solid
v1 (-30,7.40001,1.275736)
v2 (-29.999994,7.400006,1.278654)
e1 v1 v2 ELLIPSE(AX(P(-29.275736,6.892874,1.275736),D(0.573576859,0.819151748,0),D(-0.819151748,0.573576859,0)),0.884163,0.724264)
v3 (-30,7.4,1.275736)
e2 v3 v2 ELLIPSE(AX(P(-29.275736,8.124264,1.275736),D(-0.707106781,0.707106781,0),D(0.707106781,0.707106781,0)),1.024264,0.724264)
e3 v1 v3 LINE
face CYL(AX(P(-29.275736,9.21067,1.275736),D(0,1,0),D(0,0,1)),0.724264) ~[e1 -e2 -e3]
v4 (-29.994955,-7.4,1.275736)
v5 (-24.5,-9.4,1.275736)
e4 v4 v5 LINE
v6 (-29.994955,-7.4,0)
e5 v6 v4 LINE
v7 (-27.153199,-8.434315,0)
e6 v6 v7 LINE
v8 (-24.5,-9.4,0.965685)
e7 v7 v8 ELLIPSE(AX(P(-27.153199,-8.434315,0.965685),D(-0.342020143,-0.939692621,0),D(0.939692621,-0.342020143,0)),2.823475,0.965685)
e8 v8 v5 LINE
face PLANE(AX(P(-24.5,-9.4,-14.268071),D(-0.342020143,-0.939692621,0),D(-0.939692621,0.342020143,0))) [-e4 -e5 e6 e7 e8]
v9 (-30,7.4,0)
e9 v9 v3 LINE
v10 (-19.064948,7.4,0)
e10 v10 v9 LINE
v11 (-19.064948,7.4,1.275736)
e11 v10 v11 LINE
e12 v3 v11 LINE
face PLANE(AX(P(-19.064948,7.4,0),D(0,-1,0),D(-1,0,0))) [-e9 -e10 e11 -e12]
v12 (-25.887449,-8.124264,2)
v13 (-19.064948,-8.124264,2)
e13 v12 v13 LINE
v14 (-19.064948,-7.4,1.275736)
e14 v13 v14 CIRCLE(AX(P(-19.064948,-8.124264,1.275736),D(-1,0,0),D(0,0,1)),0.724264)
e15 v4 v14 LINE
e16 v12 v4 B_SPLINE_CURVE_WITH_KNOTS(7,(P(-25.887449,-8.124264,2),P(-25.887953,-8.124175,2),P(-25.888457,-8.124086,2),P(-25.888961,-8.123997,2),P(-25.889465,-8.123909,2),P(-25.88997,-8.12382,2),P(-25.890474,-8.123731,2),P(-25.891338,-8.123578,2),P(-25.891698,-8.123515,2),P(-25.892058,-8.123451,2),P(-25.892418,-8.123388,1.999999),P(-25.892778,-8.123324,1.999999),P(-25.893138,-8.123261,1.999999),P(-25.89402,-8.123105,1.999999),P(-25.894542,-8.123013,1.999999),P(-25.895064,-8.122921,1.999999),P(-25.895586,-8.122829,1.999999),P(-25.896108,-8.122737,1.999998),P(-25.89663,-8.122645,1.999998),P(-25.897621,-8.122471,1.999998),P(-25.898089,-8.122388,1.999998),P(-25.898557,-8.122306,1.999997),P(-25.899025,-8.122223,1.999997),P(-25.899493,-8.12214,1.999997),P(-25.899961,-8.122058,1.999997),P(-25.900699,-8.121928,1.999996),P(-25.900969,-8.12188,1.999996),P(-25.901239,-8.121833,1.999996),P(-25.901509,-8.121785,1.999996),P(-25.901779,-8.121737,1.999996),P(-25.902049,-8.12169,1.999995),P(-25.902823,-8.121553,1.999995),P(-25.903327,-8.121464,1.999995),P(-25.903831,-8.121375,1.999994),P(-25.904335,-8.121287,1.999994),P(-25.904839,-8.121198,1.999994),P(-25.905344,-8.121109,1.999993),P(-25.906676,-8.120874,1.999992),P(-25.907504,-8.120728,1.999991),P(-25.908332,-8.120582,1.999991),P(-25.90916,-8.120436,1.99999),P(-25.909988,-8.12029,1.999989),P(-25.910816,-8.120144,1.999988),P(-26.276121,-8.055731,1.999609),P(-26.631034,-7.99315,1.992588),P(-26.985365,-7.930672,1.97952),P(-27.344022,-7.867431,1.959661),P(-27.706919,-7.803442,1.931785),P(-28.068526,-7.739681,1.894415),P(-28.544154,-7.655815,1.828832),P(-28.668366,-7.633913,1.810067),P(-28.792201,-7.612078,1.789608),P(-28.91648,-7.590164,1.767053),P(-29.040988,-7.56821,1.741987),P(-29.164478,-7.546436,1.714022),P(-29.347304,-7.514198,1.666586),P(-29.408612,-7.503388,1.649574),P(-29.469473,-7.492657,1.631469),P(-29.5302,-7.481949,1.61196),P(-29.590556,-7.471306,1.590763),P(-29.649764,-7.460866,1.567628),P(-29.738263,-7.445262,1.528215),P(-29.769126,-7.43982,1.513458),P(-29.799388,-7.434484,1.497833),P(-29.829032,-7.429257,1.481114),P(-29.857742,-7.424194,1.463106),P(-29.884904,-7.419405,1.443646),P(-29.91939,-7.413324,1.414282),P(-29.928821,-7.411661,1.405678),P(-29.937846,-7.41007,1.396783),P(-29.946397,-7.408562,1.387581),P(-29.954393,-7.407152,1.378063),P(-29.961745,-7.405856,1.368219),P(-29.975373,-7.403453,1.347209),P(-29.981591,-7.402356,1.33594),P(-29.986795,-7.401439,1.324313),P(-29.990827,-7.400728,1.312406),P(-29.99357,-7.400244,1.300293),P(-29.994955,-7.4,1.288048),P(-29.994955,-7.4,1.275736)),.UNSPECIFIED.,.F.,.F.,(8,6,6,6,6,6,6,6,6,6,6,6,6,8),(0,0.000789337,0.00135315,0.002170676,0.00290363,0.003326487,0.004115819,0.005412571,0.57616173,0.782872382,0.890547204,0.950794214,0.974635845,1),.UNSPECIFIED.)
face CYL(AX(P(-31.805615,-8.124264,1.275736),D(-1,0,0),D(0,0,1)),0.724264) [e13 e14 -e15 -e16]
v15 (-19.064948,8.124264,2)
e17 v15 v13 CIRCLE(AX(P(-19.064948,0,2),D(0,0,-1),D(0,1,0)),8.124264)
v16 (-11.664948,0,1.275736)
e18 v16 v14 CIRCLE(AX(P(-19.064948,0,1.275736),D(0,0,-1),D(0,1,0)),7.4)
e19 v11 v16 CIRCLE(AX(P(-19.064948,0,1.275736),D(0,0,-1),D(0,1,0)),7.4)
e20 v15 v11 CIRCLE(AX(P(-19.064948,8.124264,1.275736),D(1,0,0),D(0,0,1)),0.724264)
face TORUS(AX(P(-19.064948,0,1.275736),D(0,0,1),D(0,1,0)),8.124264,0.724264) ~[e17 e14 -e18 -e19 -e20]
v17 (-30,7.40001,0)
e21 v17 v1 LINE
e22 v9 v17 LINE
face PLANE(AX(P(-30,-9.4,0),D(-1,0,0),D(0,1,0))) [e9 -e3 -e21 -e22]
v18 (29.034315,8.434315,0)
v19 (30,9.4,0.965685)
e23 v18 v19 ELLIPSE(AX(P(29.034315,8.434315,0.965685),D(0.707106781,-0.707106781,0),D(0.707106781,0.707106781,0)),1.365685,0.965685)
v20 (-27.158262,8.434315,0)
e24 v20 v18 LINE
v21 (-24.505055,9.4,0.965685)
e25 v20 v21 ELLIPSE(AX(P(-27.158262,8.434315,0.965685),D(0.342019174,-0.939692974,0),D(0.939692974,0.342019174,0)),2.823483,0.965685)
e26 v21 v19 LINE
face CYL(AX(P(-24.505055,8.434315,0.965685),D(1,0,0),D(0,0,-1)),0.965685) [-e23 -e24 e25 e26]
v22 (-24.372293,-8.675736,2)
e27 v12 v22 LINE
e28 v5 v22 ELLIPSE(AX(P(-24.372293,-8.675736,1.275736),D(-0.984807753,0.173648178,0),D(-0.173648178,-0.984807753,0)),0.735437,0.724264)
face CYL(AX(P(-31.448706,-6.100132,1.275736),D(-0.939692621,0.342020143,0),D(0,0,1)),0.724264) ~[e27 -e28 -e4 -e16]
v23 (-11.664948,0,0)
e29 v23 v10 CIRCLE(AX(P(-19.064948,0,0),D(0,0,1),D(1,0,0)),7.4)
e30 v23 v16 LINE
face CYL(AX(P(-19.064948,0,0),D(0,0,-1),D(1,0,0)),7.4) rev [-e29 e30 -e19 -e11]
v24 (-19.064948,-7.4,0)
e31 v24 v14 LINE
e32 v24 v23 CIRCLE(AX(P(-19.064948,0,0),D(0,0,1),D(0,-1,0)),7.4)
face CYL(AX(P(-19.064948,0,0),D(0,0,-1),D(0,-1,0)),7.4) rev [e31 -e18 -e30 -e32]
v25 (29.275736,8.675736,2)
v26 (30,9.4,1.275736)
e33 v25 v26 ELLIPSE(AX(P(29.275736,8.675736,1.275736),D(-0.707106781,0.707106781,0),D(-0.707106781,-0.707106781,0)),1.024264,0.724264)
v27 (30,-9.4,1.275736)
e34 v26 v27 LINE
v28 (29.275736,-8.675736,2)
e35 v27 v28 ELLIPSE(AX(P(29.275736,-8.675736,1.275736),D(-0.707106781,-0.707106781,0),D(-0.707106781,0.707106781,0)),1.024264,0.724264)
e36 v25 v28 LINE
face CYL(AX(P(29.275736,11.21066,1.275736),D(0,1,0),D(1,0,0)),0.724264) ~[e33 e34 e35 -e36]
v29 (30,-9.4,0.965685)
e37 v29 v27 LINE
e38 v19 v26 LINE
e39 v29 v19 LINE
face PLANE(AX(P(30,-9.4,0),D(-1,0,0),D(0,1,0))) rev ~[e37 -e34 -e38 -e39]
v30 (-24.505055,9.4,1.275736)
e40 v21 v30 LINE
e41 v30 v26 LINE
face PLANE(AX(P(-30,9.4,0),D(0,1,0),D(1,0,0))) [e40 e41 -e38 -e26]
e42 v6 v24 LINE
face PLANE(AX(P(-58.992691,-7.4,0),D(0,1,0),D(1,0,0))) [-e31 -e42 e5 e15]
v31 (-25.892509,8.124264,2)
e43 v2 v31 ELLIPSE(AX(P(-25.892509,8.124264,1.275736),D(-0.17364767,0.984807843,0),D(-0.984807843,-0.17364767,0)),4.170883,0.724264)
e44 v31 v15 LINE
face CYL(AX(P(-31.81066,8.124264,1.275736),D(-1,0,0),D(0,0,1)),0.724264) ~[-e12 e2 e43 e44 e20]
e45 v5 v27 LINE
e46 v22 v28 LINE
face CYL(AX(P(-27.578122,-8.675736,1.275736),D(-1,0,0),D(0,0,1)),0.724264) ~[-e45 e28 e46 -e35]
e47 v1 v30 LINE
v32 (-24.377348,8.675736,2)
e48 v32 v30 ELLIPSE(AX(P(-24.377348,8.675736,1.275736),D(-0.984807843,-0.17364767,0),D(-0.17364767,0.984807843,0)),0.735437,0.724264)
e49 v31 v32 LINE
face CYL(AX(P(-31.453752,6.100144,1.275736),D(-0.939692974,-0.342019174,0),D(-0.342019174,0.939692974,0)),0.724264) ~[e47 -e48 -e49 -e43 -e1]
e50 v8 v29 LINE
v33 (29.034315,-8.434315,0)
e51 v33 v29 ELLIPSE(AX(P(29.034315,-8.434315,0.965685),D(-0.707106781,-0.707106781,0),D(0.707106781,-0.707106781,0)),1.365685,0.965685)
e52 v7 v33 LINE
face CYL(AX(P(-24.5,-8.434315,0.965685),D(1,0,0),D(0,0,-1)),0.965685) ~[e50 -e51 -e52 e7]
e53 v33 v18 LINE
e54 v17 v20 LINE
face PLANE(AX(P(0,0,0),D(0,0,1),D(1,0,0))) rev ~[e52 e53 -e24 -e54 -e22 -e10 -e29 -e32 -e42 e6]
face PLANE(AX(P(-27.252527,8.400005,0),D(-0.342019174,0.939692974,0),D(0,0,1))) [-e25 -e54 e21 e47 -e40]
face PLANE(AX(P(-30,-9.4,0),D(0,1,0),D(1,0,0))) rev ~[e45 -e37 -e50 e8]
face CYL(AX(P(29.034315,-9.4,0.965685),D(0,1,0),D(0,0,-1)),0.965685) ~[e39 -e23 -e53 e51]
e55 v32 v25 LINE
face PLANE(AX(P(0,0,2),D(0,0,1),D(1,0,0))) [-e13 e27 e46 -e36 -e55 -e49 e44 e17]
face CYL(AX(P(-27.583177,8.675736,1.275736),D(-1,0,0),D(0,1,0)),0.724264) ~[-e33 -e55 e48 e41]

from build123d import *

# Parameters (mm, degrees)
F0_W         = 60
F0_H         = 18.8
F2_DEPTH     = 2
F3_DEPTH     = 3
F5_T1_DEPTH  = 30.5361420581
F6_SIZE2     = 5.494945
F6_SIZE      = 1.99999
F7_T1_DEPTH  = 59.3887824638
F7_T3_DEPTH  = 59.3938374638
F7_T5_DEPTH  = 22.4213203436
F7_T7_DEPTH  = 10.7363912706
F7_T9_DEPTH  = 3.6213303413
F7_T11_DEPTH = 12.745712209
F7_T13_DEPTH = 10.7363785984
F7_T15_DEPTH = 12.740667054
F7_T18_ANGLE = 180
F8_R         = 0.9656854249


# Not quite as in the source:
# - a fillet or chamfer that OpenCascade refuses, or shapes differently, is made with other operations: its cross-section is extruded or revolved along the edge and cut away or added
# - a fillet or chamfer is up to 0.001 mm smaller than in the source, because OpenCascade refuses the exact size


with BuildPart() as f2:
    # F0 (on Top) → F2 (new body)
    with BuildSketch(Plane.XY):
        Rectangle(F0_W, F0_H)
    extrude(amount=F2_DEPTH)


with BuildPart() as f3:
    # F1 (on Top) → F3 (new body)
    with BuildSketch(Plane.XY):
        with BuildLine():
            ThreePointArc((-19.0649479628, -7.3999999978), (-13.832357782, -5.2325901785), (-11.6649479628, 2.2e-09))
            ThreePointArc((-11.6649479628, 2.2e-09), (-13.832357782, 5.232590183), (-19.0649479628, 7.4000000022))
            Line((-19.0649479628, 7.4000000022), (-19.0649479628, -7.3999999978))
        make_face()
        with BuildLine():
            Line((-19.0649479628, -7.3999999978), (-19.0649479628, 7.4000000022))
            ThreePointArc((-19.0649479628, 7.4000000022), (-26.4649479628, 2.2e-09), (-19.0649479628, -7.3999999978))
        make_face()
        with BuildLine():
            ThreePointArc((-19.0649479628, -7.3999999978), (-26.4649479628, 2.2e-09), (-19.0649479628, 7.4000000022))
            Line((-19.0649479628, 7.4000000022), (-58.9926913381, 7.4000000022))
            Line((-58.9926913381, 7.4000000022), (-58.9926913381, -7.3999999978))
            Line((-58.9926913381, -7.3999999978), (-19.0649479628, -7.3999999978))
        make_face()
    extrude(amount=F3_DEPTH)


with BuildPart() as f2_1:
    add(f2.part)

    # F4: cut F3
    add(f3.part, mode=Mode.SUBTRACT)

    # F5: chamfer of 5.5 x 2.0018362885 on 1 edges, made by hand

    # F5_s2 → F5_t1 (cut)
    with BuildSketch(Plane.XY.offset(-14.268071029)):
        Polygon((-24.5, -9.4), (-30, -7.3981637115), (-30, -9.4), align=None)
    extrude(amount=F5_T1_DEPTH, mode=Mode.SUBTRACT)

    # F6 (size 2 and 5.4949548389 in the source; OpenCascade refuses exactly that, so slightly less here)
    f6_edges = [f2_1.edges().sort_by_distance(p)[0] for p in [
        (-30, 9.4, 1),
    ]]
    f6_side = f2_1.faces().sort_by_distance((-30, 8.4, 1))[0]
    chamfer(f6_edges, length=F6_SIZE, length2=F6_SIZE2, reference=f6_side)

    # F7: fillet of radius 0.7242640687 on 9 edges, made by hand

    # F7_s2 → F7_t1 (cut)
    with BuildSketch(Plane.YZ.offset(-27.578122292)):
        with BuildLine():
            ThreePointArc((-8.6757359313, 2), (-9.1878679656, 1.7878679656), (-9.4, 1.2757359313))
            Line((-9.4, 1.2757359313), (-9.4, 2))
            Line((-9.4, 2), (-8.6757359313, 2))
        make_face()
    extrude(amount=F7_T1_DEPTH, mode=Mode.SUBTRACT)

    # F7_s4 → F7_t3 (cut)
    with BuildSketch(Plane.YZ.offset(-27.583177292)):
        with BuildLine():
            ThreePointArc((9.4, 1.2757359313), (9.1878679656, 1.7878679656), (8.6757359313, 2))
            Line((8.6757359313, 2), (9.4, 2))
            Line((9.4, 2), (9.4, 1.2757359313))
        make_face()
    extrude(amount=F7_T3_DEPTH, mode=Mode.SUBTRACT)

    # F7_s6 → F7_t5 (cut)
    with BuildSketch(Plane.XZ.offset(-11.2106601718)):
        with BuildLine():
            ThreePointArc((30, 1.2757359313), (29.7878679656, 1.7878679656), (29.2757359313, 2))
            Line((29.2757359313, 2), (30, 2))
            Line((30, 2), (30, 1.2757359313))
        make_face()
    extrude(amount=F7_T5_DEPTH, mode=Mode.SUBTRACT)

    # F7_s8 → F7_t7 (cut)
    with BuildSketch(Plane(origin=(-25.8093615097, 9.3938393551, 0), x_dir=(0, 0, 1), z_dir=(0.9396926208, -0.3420201433, 0))):
        with BuildLine():
            ThreePointArc((2, 16.4883400783), (1.7878679656, 17.0004721126), (1.2757359313, 17.212604147))
            Line((1.2757359313, 17.212604147), (2, 17.212604147))
            Line((2, 17.212604147), (2, 16.4883400783))
        make_face()
    extrude(amount=F7_T7_DEPTH, mode=Mode.SUBTRACT)

    # F7_s10 → F7_t9 (cut)
    with BuildSketch(Plane.XZ.offset(-9.2106701718)):
        with BuildLine():
            ThreePointArc((-29.2757359313, 2), (-29.7878679656, 1.7878679656), (-30, 1.2757359313))
            Line((-30, 1.2757359313), (-30, 2))
            Line((-30, 2), (-29.2757359313, 2))
        make_face()
    extrude(amount=F7_T9_DEPTH, mode=Mode.SUBTRACT)

    # F7_s12 → F7_t11 (cut)
    with BuildSketch(Plane.YZ.offset(-31.8106601718)):
        with BuildLine():
            ThreePointArc((8.1242640709, 2), (7.6121320366, 1.7878679656), (7.4000000022, 1.2757359313))
            Line((7.4000000022, 1.2757359313), (7.4000000022, 2))
            Line((7.4000000022, 2), (8.1242640709, 2))
        make_face()
    extrude(amount=F7_T11_DEPTH, mode=Mode.SUBTRACT)

    # F7_s14 → F7_t13 (cut)
    with BuildSketch(Plane(origin=(-25.8138396564, -9.3954391126, 0), x_dir=(0, 0, 1), z_dir=(0.9396929736, 0.342019174, 0))):
        with BuildLine():
            ThreePointArc((1.2757359313, -17.2143126223), (1.7878679656, -17.0021805879), (2, -16.4900485536))
            Line((2, -16.4900485536), (2, -17.2143126223))
            Line((2, -17.2143126223), (1.2757359313, -17.2143126223))
        make_face()
    extrude(amount=F7_T13_DEPTH, mode=Mode.SUBTRACT)

    # F7_s16 → F7_t15 (cut)
    with BuildSketch(Plane.YZ.offset(-31.8056150167)):
        with BuildLine():
            ThreePointArc((-8.1242640665, 2), (-7.6121320321, 1.7878679656), (-7.3999999978, 1.2757359313))
            Line((-7.3999999978, 1.2757359313), (-7.3999999978, 2))
            Line((-7.3999999978, 2), (-8.1242640665, 2))
        make_face()
    extrude(amount=F7_T15_DEPTH, mode=Mode.SUBTRACT)

    # F7_s17 → F7_t18 (revolve, cut)
    with BuildSketch(Plane.YZ.offset(-19.0649479628)):
        with BuildLine():
            ThreePointArc((8.1242640709, 2), (7.6121320366, 1.7878679656), (7.4000000022, 1.2757359313))
            Line((7.4000000022, 1.2757359313), (7.4000000022, 2))
            Line((7.4000000022, 2), (8.1242640709, 2))
        make_face()
    revolve(axis=Axis((-19.0649479628, 2.2e-09, 2), (0, 0, -1)), revolution_arc=F7_T18_ANGLE, mode=Mode.SUBTRACT)

    # F8
    f8_edges = [f2_1.edges().sort_by_distance(p)[0] for p in [
        (2.75, -9.4, 0),
        (30, 0, 0),
        (2.747473, 9.4, 0),
    ]]
    fillet(f8_edges, radius=F8_R)


solid = f2_1.part
